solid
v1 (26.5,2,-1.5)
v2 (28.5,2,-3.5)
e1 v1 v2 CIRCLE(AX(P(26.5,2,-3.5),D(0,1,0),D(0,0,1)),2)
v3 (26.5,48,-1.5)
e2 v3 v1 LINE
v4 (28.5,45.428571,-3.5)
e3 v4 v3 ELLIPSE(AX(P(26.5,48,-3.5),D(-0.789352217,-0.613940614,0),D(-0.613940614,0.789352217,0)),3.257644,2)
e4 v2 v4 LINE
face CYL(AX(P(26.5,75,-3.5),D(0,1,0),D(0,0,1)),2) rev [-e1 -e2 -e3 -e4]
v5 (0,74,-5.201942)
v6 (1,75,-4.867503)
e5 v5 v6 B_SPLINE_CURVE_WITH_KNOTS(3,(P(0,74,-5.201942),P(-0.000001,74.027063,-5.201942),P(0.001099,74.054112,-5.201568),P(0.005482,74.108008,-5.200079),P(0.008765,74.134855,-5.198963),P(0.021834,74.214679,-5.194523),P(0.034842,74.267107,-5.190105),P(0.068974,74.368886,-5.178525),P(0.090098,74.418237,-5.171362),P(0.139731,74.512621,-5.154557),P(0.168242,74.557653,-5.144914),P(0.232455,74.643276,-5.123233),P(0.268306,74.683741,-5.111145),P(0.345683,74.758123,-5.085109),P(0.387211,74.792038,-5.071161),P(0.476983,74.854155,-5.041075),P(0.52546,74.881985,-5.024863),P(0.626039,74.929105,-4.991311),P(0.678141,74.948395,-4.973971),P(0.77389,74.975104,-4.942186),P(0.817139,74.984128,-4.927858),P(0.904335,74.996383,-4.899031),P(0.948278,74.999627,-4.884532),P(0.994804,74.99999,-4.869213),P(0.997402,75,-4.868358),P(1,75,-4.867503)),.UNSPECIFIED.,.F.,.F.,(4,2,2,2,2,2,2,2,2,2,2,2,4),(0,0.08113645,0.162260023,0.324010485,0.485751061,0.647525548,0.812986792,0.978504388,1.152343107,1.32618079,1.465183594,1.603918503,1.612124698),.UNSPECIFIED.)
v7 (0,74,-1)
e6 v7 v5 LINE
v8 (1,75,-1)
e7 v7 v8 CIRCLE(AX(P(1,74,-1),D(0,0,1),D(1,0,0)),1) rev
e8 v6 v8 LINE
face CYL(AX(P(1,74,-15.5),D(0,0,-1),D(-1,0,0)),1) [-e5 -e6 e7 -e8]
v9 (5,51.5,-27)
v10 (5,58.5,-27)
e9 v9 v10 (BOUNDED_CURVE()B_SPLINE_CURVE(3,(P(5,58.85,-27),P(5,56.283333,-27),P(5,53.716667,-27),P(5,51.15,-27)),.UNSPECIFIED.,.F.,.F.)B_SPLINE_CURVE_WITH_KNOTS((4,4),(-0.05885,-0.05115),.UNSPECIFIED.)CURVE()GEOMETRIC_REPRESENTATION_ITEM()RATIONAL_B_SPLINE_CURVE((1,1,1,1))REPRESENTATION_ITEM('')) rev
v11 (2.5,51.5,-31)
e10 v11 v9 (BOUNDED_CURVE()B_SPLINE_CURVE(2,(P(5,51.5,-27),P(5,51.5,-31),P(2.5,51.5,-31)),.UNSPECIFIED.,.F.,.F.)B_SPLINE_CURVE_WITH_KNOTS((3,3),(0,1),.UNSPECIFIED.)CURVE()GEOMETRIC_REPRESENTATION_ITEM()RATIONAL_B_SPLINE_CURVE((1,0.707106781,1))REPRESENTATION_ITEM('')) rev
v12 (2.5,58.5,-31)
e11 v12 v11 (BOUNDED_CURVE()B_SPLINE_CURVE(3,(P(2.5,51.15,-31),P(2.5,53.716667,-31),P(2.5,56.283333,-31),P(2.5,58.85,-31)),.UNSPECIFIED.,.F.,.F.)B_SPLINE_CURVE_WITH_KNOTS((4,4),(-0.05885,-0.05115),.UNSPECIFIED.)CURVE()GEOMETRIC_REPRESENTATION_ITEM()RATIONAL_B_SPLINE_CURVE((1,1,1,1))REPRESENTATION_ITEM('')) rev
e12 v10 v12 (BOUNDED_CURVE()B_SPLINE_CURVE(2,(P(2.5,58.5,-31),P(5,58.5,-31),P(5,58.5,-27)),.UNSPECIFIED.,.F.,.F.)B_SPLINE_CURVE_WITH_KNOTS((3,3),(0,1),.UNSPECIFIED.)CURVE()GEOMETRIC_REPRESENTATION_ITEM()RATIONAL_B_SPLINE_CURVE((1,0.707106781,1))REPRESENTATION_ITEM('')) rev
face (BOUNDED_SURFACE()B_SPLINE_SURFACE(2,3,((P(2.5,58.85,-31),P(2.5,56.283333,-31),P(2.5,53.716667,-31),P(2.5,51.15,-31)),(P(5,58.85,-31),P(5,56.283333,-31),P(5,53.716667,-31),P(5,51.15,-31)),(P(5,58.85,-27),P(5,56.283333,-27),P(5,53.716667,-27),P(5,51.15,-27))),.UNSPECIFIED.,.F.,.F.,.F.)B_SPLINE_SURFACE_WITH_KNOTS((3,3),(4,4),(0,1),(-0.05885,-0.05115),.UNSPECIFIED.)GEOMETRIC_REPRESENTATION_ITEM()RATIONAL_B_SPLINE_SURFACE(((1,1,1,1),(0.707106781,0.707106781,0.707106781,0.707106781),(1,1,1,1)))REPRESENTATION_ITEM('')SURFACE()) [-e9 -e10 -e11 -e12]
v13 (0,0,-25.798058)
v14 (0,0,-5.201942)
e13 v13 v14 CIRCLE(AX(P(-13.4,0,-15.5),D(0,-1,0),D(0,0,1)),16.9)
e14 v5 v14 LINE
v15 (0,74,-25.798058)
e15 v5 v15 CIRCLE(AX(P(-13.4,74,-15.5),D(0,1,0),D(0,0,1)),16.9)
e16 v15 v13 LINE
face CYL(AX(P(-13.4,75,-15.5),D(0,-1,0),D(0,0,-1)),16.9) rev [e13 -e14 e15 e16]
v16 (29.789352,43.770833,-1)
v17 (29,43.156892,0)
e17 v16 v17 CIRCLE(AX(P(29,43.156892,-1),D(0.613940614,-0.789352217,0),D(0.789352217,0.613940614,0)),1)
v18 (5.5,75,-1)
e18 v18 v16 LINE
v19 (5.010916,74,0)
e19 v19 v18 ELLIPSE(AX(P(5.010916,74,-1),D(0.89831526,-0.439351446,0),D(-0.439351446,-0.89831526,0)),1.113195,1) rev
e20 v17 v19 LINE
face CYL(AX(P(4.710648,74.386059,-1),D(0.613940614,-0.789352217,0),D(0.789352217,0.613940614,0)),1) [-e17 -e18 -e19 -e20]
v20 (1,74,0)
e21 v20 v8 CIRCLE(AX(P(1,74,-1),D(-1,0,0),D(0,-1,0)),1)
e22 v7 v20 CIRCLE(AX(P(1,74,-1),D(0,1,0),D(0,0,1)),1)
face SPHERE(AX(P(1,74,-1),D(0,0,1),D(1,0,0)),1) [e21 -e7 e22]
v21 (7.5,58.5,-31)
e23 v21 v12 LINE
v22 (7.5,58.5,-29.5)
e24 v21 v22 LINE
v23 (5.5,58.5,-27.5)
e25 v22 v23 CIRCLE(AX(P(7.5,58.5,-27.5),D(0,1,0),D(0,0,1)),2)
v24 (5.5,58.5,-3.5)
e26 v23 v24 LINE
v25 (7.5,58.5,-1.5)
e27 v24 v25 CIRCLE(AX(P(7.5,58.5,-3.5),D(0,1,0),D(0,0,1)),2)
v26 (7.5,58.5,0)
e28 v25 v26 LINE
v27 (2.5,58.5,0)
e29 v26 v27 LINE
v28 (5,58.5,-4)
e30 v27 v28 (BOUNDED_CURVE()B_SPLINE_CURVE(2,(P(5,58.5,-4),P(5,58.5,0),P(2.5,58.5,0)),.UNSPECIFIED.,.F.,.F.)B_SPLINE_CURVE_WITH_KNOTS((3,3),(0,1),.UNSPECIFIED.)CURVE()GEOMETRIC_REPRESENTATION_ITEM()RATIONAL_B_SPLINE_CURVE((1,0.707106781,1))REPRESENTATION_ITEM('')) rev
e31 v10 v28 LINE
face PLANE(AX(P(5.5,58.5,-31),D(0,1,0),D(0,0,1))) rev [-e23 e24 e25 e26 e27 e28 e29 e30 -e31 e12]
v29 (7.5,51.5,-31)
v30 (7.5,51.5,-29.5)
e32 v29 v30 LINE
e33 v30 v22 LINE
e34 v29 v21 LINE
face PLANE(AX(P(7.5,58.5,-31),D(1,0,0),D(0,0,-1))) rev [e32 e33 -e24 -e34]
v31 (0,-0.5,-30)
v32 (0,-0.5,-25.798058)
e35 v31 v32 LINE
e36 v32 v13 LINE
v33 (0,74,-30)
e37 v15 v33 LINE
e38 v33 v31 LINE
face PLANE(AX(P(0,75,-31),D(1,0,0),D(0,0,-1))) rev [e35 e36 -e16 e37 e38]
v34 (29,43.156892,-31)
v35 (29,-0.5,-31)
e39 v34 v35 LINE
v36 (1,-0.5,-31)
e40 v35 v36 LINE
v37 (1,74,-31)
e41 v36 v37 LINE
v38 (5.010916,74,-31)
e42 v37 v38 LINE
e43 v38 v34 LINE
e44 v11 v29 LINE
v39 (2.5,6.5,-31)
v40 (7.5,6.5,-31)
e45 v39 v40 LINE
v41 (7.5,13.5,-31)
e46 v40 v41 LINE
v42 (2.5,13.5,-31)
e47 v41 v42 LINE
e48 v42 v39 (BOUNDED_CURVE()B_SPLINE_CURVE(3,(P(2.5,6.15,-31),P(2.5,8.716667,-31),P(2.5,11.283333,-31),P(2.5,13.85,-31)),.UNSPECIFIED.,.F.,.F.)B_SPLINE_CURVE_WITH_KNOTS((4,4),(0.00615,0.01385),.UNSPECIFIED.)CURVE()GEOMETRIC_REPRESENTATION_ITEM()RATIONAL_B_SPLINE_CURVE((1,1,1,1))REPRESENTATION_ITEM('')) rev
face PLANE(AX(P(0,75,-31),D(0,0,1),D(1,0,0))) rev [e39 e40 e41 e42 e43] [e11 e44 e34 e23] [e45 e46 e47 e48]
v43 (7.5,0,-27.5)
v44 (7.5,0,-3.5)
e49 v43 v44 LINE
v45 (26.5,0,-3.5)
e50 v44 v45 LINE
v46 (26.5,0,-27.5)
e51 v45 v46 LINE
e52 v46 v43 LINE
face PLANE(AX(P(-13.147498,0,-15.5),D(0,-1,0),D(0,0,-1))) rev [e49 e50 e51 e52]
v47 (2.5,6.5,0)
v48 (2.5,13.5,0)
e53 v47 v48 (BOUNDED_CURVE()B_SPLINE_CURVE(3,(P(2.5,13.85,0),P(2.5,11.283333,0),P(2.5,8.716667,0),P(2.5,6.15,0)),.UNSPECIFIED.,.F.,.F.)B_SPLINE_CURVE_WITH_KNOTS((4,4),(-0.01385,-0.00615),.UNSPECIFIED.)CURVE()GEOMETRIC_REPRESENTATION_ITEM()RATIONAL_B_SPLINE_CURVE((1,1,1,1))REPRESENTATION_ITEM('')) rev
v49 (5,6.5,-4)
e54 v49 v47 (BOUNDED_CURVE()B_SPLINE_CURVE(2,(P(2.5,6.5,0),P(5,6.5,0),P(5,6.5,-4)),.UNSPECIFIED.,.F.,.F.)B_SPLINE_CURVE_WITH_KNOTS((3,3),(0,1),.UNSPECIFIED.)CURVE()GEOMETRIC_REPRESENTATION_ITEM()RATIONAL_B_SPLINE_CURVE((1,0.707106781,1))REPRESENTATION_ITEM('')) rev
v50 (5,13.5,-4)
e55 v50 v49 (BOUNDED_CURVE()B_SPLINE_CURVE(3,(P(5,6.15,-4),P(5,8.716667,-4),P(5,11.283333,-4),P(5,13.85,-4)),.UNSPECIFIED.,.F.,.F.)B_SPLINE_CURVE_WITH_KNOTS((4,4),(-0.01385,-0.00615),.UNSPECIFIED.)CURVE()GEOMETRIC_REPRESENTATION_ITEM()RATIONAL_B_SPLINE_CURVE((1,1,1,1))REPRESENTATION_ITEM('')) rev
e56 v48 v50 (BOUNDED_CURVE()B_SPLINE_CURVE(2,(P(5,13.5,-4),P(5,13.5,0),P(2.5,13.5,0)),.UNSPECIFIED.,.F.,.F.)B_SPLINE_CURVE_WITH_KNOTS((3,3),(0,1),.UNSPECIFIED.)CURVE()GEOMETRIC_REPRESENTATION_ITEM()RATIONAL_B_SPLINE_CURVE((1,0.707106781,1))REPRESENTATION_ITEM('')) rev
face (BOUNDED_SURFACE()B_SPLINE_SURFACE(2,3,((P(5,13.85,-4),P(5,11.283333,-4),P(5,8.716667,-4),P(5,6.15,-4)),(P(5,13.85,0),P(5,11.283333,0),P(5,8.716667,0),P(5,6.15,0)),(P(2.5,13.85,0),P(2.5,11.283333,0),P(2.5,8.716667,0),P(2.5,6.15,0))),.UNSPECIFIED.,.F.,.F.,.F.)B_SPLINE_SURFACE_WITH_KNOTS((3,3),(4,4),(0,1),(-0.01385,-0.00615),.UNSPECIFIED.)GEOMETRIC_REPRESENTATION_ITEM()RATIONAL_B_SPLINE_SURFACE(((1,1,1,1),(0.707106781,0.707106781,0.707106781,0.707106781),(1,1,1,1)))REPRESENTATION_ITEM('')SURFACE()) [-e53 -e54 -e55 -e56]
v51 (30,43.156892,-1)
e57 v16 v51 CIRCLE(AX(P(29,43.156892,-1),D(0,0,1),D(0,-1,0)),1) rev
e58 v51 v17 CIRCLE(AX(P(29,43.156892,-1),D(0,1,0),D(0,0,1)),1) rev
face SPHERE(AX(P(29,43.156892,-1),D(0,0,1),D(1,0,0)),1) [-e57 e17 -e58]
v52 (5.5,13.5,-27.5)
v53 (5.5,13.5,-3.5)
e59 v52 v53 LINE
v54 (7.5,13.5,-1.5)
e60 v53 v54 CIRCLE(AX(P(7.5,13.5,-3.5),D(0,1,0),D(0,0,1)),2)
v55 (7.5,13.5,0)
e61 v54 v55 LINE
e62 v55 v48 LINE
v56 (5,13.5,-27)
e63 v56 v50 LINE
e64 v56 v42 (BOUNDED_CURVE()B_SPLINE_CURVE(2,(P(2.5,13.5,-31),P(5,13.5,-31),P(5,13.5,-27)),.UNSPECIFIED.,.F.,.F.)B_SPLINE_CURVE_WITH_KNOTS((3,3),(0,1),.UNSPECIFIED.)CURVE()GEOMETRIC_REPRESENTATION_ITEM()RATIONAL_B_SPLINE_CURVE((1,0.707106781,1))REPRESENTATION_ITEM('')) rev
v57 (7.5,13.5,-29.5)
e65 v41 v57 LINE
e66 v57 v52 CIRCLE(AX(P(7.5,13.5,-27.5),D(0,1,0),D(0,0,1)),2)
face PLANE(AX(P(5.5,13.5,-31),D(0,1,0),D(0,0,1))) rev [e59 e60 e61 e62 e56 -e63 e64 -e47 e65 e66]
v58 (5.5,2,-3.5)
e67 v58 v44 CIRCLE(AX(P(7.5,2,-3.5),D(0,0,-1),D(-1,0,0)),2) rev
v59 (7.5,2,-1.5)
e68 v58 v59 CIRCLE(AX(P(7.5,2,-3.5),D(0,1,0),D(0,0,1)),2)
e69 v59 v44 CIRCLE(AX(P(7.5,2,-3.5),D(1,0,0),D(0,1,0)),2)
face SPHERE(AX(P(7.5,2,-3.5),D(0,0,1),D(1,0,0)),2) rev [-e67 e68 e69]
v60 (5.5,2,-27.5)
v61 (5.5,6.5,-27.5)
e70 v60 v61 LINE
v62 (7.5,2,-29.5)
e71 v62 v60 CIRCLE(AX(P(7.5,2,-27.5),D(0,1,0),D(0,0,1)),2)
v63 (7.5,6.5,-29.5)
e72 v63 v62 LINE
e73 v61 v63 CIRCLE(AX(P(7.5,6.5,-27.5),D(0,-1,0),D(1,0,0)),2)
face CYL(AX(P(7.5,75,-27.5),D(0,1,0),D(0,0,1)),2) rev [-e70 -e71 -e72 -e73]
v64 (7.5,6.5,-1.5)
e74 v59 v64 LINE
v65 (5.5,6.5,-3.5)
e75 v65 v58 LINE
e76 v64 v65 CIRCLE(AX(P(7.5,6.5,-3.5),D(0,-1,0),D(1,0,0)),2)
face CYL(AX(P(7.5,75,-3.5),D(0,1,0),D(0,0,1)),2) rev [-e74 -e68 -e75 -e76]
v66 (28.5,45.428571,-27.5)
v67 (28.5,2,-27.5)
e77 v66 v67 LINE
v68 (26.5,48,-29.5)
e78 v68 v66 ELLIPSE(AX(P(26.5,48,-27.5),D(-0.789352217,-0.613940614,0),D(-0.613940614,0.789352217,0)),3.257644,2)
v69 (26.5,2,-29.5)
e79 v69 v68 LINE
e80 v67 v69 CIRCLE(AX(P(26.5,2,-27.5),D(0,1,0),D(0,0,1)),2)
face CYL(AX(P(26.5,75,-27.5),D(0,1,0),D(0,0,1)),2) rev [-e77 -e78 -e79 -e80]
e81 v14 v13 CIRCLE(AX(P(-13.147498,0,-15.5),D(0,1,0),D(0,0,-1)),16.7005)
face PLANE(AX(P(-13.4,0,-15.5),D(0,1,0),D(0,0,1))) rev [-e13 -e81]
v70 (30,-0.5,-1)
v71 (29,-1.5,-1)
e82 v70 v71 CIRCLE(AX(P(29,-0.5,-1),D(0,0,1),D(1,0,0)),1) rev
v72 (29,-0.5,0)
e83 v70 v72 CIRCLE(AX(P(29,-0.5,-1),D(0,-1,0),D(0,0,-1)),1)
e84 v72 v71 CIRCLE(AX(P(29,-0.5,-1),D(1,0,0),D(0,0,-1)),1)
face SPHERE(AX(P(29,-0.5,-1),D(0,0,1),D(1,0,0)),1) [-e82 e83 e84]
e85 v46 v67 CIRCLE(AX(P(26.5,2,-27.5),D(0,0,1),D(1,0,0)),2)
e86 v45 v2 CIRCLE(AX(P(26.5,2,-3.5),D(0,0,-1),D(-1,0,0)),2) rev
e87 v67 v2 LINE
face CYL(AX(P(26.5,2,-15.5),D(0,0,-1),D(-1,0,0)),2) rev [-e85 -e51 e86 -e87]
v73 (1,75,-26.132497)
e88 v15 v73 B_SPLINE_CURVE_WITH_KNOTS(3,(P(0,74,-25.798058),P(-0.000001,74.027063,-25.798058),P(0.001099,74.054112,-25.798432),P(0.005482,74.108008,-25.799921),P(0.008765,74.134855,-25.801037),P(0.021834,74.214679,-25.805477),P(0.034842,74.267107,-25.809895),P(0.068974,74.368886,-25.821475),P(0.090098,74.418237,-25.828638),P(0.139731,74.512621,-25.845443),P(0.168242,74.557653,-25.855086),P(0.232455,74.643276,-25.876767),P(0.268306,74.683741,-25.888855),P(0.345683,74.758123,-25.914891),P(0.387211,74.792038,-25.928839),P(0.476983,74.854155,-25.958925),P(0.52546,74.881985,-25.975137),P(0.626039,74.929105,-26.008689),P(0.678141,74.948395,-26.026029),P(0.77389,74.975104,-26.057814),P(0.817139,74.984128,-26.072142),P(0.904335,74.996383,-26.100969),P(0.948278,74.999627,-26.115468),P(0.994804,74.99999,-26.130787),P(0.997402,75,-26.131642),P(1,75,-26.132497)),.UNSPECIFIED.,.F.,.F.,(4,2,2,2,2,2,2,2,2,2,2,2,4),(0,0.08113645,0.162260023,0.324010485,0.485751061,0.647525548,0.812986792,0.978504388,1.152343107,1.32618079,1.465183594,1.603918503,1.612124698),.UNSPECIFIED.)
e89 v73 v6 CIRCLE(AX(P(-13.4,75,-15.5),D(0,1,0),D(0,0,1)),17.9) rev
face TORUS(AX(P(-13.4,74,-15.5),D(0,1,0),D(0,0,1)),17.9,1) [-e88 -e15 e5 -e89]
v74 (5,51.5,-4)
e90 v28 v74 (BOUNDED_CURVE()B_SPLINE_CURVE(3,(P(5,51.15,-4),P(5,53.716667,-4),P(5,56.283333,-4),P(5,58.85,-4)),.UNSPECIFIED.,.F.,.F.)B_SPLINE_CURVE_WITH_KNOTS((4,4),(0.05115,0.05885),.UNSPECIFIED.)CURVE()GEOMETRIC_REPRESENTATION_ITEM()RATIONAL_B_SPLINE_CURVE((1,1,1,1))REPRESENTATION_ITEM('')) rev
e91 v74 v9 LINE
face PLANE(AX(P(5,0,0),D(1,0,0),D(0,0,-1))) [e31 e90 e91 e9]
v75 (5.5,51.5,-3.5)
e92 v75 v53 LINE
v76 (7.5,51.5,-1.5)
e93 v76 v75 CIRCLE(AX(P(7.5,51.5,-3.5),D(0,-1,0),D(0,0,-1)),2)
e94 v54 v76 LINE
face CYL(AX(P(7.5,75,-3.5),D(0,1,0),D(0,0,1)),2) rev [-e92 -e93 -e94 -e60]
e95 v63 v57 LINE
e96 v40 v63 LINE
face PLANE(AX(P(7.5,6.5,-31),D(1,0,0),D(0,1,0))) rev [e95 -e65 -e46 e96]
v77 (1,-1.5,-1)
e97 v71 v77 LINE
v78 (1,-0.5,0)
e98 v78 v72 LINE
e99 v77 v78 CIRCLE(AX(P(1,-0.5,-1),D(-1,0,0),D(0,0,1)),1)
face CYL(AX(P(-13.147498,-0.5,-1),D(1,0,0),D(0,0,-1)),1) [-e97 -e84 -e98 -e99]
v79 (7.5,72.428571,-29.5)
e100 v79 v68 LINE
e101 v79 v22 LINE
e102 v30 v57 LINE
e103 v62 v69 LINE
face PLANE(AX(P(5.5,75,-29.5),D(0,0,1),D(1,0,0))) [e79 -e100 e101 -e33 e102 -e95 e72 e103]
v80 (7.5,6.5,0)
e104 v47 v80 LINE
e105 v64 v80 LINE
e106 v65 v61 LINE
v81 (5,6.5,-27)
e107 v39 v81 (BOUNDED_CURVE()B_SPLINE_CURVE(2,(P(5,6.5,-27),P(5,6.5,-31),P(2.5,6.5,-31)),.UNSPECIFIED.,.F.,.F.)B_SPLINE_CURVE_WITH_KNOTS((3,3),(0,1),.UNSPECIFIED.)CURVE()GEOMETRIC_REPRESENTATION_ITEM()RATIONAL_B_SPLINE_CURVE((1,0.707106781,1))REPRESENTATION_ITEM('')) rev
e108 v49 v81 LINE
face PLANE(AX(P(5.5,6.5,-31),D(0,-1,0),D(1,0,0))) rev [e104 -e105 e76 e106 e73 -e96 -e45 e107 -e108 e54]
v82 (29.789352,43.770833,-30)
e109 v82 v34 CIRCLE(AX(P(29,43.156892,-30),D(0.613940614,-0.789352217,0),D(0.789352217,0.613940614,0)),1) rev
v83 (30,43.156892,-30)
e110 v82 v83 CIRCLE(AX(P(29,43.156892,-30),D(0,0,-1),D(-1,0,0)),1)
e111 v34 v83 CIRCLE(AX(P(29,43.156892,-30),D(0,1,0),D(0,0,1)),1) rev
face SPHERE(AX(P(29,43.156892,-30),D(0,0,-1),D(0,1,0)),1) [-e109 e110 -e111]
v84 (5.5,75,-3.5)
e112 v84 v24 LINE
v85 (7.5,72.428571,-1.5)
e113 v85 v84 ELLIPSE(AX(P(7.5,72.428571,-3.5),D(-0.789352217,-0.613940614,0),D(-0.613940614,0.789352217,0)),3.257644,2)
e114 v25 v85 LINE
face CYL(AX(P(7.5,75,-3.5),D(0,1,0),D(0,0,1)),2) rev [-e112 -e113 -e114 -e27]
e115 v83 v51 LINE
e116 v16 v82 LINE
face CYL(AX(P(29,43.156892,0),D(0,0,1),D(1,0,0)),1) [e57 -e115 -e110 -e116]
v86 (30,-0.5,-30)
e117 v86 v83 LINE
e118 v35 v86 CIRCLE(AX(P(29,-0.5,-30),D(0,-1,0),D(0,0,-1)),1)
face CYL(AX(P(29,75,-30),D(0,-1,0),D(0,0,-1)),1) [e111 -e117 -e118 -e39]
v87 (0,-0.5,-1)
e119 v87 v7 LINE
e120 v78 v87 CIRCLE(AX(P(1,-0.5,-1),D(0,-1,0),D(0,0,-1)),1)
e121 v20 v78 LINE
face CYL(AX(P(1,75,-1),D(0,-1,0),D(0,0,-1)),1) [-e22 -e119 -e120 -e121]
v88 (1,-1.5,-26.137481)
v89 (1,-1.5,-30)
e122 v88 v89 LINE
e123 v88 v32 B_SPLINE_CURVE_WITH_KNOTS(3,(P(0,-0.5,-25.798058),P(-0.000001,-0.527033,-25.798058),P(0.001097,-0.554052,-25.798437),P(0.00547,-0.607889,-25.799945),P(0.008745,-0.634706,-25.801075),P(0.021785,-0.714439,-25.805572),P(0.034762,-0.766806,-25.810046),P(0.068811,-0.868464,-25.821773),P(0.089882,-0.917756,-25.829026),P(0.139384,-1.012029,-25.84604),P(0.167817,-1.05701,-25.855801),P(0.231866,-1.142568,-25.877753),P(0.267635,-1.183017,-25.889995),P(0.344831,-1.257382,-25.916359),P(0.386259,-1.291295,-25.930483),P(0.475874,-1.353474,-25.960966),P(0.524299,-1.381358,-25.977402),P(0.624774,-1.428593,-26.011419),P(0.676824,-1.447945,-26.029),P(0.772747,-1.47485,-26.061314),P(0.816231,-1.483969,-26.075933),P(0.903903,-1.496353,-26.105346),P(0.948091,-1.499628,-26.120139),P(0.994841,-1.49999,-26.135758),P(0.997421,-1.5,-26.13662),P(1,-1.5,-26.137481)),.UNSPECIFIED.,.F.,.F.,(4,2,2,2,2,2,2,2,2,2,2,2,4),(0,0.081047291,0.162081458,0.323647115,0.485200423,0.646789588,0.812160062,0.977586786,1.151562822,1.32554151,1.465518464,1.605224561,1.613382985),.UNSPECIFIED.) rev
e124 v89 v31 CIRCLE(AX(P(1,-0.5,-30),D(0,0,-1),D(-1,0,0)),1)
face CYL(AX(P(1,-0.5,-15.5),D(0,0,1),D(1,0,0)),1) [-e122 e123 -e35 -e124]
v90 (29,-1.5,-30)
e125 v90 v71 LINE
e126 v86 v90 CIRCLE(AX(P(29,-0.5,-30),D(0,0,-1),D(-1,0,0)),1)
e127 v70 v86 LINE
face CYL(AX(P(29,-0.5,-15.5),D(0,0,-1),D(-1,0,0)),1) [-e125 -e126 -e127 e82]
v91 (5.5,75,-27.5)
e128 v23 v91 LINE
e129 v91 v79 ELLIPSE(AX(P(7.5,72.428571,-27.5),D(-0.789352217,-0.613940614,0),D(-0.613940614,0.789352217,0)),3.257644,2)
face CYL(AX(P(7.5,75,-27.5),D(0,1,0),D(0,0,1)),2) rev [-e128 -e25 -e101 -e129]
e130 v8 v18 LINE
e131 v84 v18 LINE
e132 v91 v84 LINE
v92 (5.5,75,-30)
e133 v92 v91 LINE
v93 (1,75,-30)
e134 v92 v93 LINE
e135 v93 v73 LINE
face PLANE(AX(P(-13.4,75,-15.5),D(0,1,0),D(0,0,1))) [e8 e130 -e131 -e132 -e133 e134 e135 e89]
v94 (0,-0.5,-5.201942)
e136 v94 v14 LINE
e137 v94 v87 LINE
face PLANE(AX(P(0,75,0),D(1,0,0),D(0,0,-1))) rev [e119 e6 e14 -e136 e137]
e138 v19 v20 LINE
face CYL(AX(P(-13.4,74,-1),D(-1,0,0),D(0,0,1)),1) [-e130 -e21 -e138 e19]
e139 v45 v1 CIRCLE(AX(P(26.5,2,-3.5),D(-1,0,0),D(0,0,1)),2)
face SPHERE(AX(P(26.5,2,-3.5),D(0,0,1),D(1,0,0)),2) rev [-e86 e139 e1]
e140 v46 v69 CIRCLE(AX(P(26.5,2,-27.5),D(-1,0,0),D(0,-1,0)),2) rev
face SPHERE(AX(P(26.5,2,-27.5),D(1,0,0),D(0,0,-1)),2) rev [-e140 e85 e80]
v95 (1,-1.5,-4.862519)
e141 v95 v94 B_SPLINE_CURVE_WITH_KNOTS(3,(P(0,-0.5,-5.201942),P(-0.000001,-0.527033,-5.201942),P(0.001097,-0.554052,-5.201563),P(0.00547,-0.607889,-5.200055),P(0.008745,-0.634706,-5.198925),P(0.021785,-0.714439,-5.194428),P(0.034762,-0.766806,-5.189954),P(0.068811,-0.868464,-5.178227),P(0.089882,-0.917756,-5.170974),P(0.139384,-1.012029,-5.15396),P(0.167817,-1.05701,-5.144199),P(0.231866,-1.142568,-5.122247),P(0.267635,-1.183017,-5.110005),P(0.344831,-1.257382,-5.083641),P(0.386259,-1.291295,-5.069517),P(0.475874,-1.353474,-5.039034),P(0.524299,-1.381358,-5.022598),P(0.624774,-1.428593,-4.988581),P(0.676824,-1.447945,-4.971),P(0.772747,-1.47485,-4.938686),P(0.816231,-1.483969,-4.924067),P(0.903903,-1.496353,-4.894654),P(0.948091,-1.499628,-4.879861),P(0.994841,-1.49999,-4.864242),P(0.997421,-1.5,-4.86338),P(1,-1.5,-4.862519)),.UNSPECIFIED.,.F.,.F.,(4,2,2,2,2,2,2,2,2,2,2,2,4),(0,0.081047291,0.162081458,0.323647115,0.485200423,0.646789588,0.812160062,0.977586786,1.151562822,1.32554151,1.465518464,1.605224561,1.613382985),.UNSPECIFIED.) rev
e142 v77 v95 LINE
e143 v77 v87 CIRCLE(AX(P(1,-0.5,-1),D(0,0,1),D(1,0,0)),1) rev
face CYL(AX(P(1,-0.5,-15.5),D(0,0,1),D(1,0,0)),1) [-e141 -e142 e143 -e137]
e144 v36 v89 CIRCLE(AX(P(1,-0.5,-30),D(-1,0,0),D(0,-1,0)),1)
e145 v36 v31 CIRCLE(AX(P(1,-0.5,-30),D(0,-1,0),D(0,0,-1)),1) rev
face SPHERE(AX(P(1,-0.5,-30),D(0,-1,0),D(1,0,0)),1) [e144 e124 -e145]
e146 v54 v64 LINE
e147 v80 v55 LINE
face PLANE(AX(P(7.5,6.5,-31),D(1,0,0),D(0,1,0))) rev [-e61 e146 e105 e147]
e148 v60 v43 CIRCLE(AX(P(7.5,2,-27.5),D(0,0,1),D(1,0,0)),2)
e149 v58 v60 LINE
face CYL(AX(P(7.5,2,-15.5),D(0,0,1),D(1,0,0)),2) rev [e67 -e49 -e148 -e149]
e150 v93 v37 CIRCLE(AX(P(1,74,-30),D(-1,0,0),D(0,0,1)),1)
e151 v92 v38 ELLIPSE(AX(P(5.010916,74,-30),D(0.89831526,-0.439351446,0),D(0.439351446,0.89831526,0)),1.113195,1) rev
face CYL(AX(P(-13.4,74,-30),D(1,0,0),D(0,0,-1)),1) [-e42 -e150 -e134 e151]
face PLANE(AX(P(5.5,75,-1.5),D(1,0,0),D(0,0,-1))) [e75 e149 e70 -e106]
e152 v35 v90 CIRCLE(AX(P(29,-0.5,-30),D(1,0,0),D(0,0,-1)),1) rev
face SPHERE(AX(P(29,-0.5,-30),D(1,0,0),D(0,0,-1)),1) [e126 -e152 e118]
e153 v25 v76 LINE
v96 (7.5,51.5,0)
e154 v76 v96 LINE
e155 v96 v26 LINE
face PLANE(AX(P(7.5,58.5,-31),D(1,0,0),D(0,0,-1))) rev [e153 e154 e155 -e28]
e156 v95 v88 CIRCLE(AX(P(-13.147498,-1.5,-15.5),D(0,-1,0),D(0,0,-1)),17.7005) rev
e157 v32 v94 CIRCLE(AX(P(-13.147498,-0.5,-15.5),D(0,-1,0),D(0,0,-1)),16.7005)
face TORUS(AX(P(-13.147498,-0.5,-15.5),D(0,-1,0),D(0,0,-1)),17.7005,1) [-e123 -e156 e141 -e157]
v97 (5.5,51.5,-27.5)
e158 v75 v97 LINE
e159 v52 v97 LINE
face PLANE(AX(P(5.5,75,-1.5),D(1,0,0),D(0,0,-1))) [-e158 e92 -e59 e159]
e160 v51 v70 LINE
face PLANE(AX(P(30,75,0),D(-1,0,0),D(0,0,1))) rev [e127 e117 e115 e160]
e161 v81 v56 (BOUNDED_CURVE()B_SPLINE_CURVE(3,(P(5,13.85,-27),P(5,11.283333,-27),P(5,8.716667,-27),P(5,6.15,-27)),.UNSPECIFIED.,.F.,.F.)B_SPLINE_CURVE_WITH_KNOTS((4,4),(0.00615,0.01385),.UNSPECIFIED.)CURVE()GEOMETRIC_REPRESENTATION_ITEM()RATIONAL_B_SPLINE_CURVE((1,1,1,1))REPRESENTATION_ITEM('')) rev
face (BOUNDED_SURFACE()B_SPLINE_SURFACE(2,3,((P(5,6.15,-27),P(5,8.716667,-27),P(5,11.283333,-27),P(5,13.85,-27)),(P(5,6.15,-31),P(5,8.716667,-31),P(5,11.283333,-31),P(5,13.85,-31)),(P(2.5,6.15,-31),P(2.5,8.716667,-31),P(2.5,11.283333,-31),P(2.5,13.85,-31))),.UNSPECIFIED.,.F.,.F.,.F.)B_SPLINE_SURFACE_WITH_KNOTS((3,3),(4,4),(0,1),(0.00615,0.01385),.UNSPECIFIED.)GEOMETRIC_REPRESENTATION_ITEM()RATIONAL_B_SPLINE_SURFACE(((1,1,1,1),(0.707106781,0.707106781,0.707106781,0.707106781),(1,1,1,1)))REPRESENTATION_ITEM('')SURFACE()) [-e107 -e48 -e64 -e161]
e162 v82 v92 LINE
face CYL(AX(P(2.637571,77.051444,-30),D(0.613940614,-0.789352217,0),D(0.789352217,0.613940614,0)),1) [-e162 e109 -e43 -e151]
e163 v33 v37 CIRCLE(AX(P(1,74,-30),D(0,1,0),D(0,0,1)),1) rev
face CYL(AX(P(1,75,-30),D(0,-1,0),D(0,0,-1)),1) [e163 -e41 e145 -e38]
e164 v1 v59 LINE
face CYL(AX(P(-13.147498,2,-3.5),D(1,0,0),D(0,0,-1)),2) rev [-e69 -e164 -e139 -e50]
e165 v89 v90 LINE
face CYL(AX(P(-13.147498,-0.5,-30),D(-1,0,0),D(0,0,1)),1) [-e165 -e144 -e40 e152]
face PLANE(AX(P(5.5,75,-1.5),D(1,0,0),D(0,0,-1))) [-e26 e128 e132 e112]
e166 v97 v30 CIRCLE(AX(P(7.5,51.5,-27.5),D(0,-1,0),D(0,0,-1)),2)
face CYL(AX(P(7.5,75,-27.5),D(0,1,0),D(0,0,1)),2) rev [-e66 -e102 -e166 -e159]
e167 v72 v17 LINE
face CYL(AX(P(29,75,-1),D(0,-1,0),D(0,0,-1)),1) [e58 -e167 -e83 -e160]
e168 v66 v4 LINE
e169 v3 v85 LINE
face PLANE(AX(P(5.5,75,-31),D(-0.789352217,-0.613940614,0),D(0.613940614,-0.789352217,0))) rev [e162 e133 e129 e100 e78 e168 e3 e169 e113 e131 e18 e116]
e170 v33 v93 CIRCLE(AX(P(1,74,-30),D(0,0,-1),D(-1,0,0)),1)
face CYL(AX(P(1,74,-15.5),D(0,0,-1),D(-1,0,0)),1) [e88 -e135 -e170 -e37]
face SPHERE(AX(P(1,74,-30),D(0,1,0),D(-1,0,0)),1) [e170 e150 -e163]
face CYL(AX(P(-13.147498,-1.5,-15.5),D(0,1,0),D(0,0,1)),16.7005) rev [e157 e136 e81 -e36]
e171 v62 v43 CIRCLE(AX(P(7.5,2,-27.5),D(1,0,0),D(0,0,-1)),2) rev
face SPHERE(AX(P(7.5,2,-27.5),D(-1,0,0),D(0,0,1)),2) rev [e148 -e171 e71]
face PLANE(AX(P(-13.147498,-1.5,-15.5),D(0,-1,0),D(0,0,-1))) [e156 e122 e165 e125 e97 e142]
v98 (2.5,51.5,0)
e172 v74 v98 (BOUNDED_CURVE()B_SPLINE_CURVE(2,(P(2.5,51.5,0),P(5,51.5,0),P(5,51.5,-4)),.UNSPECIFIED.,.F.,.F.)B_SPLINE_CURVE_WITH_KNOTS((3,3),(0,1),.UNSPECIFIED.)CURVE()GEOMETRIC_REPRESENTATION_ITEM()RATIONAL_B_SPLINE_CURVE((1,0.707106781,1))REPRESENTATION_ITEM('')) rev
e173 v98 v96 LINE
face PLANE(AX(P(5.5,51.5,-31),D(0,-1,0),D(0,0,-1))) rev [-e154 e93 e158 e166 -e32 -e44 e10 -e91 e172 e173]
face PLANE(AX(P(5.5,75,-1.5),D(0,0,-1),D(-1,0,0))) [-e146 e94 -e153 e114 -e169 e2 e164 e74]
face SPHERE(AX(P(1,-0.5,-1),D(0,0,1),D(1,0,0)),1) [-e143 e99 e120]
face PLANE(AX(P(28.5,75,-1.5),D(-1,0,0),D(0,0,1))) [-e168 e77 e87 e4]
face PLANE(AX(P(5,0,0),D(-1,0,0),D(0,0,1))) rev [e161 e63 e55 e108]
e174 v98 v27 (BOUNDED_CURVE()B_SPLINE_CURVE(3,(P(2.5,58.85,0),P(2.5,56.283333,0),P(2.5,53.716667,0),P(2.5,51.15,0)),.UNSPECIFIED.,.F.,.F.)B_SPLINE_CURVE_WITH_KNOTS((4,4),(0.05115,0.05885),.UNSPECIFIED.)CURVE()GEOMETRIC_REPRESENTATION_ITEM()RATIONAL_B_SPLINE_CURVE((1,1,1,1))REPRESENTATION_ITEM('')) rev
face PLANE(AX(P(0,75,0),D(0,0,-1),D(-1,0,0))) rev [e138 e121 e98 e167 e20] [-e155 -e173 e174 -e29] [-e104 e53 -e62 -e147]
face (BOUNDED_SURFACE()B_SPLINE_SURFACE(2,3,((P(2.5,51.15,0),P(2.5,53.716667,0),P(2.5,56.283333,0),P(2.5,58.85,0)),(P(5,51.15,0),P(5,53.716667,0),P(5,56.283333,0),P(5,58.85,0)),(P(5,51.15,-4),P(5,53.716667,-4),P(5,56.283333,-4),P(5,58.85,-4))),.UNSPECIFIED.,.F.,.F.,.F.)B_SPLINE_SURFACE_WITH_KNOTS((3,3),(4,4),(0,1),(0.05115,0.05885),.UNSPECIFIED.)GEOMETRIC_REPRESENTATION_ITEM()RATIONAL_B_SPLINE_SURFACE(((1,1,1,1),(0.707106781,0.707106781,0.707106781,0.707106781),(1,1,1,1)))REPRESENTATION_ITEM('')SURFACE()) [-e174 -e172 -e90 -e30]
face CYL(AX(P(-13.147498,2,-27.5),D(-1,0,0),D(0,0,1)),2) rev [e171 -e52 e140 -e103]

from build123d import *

# Parameters (mm, degrees)
SKETCH1_W           = 23
SKETCH1_H           = 28
BOSS_EXTRUDE1_DEPTH = 75
BOSS_EXTRUDE2_DEPTH = 1.5
CUT_EXTRUDE1_DEPTH  = 87.521673585
FILLET1_R           = 1
SKETCH7_W           = 2
SKETCH7_H           = 7
CUT_EXTRUDE2_DEPTH  = 87.521673672
SKETCH8_W           = 31
SKETCH8_H           = 7
CUT_EXTRUDE3_DEPTH  = 0.5
FILLET2_SIZE        = 2.5
FILLET2_SIZE_2      = 4
FILLET3_R           = 2


with BuildPart() as part:
    # Sketch1 → Boss-Extrude1 (new body)
    with BuildSketch(Plane(origin=(0, 0, 0), x_dir=(1, 0, 0), z_dir=(0, 1, 0))):
        with BuildLine():
            Line((0, 0), (30, 0))
            Line((30, 0), (30, 31))
            Line((30, 31), (0, 31))
            Line((0, 31), (0, 25.798058069))
            ThreePointArc((0, 25.798058069), (3.5, 15.5), (0, 5.201941931))
            Line((0, 5.201941931), (0, 0))
        make_face()
        with Locations((17, 15.5)):
            Rectangle(SKETCH1_W, SKETCH1_H, mode=Mode.SUBTRACT)
    extrude(amount=BOSS_EXTRUDE1_DEPTH)

    # Sketch2 → Boss-Extrude2 (add)
    with BuildSketch(Plane.XZ):
        with BuildLine():
            Line((0, -25.798058069), (0, -31))
            Line((0, -31), (30, -31))
            Line((30, -31), (30, 0))
            Line((30, 0), (0, 0))
            Line((0, 0), (0, -5.201941931))
            ThreePointArc((0, -5.201941931), (3.55300213, -15.5), (0, -25.798058069))
        make_face()
    extrude(amount=BOSS_EXTRUDE2_DEPTH)

    # Sketch6 → Cut-Extrude1 (cut, through all)
    with BuildSketch(Plane.XY):
        Polygon((5.5, 75), (30, 43.5), (30, 75), align=None)
    extrude(amount=-CUT_EXTRUDE1_DEPTH, mode=Mode.SUBTRACT)

    # Fillet1
    fillet1_edges = [part.edges().sort_by_distance(p)[0] for p in [
        (0, 36.75, -31),
        (0, 36.75, 0),
        (0, 75, -28.399029035),
        (3.5, 75, -15.5),
        (0, -1.5, -2.600970965),
        (3.55300213, -1.5, -15.5),
        (0, -1.5, -28.399029035),
        (15, -1.5, -31),
        (30, -1.5, -15.5),
        (15, -1.5, 0),
        (0, 75, -2.600970965),
        (30, 21, -31),
        (2.75, 75, -31),
        (30, 21, 0),
        (17.75, 59.25, -31),
        (30, 43.5, -15.5),
        (17.75, 59.25, 0),
        (2.75, 75, 0),
    ]]
    fillet(fillet1_edges, radius=FILLET1_R)

    # Sketch7 → Cut-Extrude2 (cut, through all)
    with BuildSketch(Plane.XY):
        with Locations((6.5, 55)):
            Rectangle(SKETCH7_W, SKETCH7_H)
        with Locations((6.5, 10)):
            Rectangle(SKETCH7_W, SKETCH7_H)
    extrude(amount=-CUT_EXTRUDE2_DEPTH, mode=Mode.SUBTRACT)

    # Sketch8 → Cut-Extrude3 (cut)
    with BuildSketch(Plane(origin=(5.5, 0, 0), x_dir=(0, 0, -1), z_dir=(1, 0, 0))):
        with Locations((15.5, 55)):
            Rectangle(SKETCH8_W, SKETCH8_H)
        with Locations((15.5, 10)):
            Rectangle(SKETCH8_W, SKETCH8_H)
    extrude(amount=-CUT_EXTRUDE3_DEPTH, mode=Mode.SUBTRACT)

    # Fillet2
    # an asymmetric fillet: 4, 2.5 mm, written as the material it takes off along each edge
    with BuildSketch(Plane(origin=(5, 6.5, -31), x_dir=(-1, 0, 0), z_dir=(0, 1, 0)), Plane(origin=(5, 13.5, 0), x_dir=(-1, 0, 0), z_dir=(0, -1, 0))) as fillet2_piece_1:
        with BuildLine():
            Bezier((FILLET2_SIZE, 0), (0, 0), (0, FILLET2_SIZE_2), weights=[1, 0.707106781, 1])
            Line((0, FILLET2_SIZE_2), (0, 0))
            Line((0, 0), (FILLET2_SIZE, 0))
        make_face()
    extrude(amount=7, mode=Mode.SUBTRACT)
    with BuildSketch(Plane(origin=(5, 58.5, -31), x_dir=(-1, 0, 0), z_dir=(0, -1, 0)), Plane(origin=(5, 51.5, 0), x_dir=(-1, 0, 0), z_dir=(0, 1, 0))) as fillet2_piece_2:
        with BuildLine():
            Bezier((FILLET2_SIZE, 0), (0, 0), (0, -FILLET2_SIZE_2), weights=[1, 0.707106781, 1])
            Line((0, -FILLET2_SIZE_2), (0, 0))
            Line((0, 0), (FILLET2_SIZE, 0))
        make_face()
    extrude(amount=7, mode=Mode.SUBTRACT)

    # Fillet3
    fillet3_edges = [part.edges().sort_by_distance(p)[0] for p in [
        (5.5, 32.5, -29.5),
        (5.5, 3.25, -29.5),
        (5.5, 32.5, -1.5),
        (5.5, 3.25, -1.5),
        (5.5, 0, -15.5),
        (5.5, 66.75, -29.5),
        (17, 0, -1.5),
        (5.5, 66.75, -1.5),
        (28.5, 0, -15.5),
        (17, 0, -29.5),
        (28.5, 22.714285714, -29.5),
        (28.5, 22.714285714, -1.5),
    ]]
    fillet(fillet3_edges, radius=FILLET3_R)


solid = part.part
